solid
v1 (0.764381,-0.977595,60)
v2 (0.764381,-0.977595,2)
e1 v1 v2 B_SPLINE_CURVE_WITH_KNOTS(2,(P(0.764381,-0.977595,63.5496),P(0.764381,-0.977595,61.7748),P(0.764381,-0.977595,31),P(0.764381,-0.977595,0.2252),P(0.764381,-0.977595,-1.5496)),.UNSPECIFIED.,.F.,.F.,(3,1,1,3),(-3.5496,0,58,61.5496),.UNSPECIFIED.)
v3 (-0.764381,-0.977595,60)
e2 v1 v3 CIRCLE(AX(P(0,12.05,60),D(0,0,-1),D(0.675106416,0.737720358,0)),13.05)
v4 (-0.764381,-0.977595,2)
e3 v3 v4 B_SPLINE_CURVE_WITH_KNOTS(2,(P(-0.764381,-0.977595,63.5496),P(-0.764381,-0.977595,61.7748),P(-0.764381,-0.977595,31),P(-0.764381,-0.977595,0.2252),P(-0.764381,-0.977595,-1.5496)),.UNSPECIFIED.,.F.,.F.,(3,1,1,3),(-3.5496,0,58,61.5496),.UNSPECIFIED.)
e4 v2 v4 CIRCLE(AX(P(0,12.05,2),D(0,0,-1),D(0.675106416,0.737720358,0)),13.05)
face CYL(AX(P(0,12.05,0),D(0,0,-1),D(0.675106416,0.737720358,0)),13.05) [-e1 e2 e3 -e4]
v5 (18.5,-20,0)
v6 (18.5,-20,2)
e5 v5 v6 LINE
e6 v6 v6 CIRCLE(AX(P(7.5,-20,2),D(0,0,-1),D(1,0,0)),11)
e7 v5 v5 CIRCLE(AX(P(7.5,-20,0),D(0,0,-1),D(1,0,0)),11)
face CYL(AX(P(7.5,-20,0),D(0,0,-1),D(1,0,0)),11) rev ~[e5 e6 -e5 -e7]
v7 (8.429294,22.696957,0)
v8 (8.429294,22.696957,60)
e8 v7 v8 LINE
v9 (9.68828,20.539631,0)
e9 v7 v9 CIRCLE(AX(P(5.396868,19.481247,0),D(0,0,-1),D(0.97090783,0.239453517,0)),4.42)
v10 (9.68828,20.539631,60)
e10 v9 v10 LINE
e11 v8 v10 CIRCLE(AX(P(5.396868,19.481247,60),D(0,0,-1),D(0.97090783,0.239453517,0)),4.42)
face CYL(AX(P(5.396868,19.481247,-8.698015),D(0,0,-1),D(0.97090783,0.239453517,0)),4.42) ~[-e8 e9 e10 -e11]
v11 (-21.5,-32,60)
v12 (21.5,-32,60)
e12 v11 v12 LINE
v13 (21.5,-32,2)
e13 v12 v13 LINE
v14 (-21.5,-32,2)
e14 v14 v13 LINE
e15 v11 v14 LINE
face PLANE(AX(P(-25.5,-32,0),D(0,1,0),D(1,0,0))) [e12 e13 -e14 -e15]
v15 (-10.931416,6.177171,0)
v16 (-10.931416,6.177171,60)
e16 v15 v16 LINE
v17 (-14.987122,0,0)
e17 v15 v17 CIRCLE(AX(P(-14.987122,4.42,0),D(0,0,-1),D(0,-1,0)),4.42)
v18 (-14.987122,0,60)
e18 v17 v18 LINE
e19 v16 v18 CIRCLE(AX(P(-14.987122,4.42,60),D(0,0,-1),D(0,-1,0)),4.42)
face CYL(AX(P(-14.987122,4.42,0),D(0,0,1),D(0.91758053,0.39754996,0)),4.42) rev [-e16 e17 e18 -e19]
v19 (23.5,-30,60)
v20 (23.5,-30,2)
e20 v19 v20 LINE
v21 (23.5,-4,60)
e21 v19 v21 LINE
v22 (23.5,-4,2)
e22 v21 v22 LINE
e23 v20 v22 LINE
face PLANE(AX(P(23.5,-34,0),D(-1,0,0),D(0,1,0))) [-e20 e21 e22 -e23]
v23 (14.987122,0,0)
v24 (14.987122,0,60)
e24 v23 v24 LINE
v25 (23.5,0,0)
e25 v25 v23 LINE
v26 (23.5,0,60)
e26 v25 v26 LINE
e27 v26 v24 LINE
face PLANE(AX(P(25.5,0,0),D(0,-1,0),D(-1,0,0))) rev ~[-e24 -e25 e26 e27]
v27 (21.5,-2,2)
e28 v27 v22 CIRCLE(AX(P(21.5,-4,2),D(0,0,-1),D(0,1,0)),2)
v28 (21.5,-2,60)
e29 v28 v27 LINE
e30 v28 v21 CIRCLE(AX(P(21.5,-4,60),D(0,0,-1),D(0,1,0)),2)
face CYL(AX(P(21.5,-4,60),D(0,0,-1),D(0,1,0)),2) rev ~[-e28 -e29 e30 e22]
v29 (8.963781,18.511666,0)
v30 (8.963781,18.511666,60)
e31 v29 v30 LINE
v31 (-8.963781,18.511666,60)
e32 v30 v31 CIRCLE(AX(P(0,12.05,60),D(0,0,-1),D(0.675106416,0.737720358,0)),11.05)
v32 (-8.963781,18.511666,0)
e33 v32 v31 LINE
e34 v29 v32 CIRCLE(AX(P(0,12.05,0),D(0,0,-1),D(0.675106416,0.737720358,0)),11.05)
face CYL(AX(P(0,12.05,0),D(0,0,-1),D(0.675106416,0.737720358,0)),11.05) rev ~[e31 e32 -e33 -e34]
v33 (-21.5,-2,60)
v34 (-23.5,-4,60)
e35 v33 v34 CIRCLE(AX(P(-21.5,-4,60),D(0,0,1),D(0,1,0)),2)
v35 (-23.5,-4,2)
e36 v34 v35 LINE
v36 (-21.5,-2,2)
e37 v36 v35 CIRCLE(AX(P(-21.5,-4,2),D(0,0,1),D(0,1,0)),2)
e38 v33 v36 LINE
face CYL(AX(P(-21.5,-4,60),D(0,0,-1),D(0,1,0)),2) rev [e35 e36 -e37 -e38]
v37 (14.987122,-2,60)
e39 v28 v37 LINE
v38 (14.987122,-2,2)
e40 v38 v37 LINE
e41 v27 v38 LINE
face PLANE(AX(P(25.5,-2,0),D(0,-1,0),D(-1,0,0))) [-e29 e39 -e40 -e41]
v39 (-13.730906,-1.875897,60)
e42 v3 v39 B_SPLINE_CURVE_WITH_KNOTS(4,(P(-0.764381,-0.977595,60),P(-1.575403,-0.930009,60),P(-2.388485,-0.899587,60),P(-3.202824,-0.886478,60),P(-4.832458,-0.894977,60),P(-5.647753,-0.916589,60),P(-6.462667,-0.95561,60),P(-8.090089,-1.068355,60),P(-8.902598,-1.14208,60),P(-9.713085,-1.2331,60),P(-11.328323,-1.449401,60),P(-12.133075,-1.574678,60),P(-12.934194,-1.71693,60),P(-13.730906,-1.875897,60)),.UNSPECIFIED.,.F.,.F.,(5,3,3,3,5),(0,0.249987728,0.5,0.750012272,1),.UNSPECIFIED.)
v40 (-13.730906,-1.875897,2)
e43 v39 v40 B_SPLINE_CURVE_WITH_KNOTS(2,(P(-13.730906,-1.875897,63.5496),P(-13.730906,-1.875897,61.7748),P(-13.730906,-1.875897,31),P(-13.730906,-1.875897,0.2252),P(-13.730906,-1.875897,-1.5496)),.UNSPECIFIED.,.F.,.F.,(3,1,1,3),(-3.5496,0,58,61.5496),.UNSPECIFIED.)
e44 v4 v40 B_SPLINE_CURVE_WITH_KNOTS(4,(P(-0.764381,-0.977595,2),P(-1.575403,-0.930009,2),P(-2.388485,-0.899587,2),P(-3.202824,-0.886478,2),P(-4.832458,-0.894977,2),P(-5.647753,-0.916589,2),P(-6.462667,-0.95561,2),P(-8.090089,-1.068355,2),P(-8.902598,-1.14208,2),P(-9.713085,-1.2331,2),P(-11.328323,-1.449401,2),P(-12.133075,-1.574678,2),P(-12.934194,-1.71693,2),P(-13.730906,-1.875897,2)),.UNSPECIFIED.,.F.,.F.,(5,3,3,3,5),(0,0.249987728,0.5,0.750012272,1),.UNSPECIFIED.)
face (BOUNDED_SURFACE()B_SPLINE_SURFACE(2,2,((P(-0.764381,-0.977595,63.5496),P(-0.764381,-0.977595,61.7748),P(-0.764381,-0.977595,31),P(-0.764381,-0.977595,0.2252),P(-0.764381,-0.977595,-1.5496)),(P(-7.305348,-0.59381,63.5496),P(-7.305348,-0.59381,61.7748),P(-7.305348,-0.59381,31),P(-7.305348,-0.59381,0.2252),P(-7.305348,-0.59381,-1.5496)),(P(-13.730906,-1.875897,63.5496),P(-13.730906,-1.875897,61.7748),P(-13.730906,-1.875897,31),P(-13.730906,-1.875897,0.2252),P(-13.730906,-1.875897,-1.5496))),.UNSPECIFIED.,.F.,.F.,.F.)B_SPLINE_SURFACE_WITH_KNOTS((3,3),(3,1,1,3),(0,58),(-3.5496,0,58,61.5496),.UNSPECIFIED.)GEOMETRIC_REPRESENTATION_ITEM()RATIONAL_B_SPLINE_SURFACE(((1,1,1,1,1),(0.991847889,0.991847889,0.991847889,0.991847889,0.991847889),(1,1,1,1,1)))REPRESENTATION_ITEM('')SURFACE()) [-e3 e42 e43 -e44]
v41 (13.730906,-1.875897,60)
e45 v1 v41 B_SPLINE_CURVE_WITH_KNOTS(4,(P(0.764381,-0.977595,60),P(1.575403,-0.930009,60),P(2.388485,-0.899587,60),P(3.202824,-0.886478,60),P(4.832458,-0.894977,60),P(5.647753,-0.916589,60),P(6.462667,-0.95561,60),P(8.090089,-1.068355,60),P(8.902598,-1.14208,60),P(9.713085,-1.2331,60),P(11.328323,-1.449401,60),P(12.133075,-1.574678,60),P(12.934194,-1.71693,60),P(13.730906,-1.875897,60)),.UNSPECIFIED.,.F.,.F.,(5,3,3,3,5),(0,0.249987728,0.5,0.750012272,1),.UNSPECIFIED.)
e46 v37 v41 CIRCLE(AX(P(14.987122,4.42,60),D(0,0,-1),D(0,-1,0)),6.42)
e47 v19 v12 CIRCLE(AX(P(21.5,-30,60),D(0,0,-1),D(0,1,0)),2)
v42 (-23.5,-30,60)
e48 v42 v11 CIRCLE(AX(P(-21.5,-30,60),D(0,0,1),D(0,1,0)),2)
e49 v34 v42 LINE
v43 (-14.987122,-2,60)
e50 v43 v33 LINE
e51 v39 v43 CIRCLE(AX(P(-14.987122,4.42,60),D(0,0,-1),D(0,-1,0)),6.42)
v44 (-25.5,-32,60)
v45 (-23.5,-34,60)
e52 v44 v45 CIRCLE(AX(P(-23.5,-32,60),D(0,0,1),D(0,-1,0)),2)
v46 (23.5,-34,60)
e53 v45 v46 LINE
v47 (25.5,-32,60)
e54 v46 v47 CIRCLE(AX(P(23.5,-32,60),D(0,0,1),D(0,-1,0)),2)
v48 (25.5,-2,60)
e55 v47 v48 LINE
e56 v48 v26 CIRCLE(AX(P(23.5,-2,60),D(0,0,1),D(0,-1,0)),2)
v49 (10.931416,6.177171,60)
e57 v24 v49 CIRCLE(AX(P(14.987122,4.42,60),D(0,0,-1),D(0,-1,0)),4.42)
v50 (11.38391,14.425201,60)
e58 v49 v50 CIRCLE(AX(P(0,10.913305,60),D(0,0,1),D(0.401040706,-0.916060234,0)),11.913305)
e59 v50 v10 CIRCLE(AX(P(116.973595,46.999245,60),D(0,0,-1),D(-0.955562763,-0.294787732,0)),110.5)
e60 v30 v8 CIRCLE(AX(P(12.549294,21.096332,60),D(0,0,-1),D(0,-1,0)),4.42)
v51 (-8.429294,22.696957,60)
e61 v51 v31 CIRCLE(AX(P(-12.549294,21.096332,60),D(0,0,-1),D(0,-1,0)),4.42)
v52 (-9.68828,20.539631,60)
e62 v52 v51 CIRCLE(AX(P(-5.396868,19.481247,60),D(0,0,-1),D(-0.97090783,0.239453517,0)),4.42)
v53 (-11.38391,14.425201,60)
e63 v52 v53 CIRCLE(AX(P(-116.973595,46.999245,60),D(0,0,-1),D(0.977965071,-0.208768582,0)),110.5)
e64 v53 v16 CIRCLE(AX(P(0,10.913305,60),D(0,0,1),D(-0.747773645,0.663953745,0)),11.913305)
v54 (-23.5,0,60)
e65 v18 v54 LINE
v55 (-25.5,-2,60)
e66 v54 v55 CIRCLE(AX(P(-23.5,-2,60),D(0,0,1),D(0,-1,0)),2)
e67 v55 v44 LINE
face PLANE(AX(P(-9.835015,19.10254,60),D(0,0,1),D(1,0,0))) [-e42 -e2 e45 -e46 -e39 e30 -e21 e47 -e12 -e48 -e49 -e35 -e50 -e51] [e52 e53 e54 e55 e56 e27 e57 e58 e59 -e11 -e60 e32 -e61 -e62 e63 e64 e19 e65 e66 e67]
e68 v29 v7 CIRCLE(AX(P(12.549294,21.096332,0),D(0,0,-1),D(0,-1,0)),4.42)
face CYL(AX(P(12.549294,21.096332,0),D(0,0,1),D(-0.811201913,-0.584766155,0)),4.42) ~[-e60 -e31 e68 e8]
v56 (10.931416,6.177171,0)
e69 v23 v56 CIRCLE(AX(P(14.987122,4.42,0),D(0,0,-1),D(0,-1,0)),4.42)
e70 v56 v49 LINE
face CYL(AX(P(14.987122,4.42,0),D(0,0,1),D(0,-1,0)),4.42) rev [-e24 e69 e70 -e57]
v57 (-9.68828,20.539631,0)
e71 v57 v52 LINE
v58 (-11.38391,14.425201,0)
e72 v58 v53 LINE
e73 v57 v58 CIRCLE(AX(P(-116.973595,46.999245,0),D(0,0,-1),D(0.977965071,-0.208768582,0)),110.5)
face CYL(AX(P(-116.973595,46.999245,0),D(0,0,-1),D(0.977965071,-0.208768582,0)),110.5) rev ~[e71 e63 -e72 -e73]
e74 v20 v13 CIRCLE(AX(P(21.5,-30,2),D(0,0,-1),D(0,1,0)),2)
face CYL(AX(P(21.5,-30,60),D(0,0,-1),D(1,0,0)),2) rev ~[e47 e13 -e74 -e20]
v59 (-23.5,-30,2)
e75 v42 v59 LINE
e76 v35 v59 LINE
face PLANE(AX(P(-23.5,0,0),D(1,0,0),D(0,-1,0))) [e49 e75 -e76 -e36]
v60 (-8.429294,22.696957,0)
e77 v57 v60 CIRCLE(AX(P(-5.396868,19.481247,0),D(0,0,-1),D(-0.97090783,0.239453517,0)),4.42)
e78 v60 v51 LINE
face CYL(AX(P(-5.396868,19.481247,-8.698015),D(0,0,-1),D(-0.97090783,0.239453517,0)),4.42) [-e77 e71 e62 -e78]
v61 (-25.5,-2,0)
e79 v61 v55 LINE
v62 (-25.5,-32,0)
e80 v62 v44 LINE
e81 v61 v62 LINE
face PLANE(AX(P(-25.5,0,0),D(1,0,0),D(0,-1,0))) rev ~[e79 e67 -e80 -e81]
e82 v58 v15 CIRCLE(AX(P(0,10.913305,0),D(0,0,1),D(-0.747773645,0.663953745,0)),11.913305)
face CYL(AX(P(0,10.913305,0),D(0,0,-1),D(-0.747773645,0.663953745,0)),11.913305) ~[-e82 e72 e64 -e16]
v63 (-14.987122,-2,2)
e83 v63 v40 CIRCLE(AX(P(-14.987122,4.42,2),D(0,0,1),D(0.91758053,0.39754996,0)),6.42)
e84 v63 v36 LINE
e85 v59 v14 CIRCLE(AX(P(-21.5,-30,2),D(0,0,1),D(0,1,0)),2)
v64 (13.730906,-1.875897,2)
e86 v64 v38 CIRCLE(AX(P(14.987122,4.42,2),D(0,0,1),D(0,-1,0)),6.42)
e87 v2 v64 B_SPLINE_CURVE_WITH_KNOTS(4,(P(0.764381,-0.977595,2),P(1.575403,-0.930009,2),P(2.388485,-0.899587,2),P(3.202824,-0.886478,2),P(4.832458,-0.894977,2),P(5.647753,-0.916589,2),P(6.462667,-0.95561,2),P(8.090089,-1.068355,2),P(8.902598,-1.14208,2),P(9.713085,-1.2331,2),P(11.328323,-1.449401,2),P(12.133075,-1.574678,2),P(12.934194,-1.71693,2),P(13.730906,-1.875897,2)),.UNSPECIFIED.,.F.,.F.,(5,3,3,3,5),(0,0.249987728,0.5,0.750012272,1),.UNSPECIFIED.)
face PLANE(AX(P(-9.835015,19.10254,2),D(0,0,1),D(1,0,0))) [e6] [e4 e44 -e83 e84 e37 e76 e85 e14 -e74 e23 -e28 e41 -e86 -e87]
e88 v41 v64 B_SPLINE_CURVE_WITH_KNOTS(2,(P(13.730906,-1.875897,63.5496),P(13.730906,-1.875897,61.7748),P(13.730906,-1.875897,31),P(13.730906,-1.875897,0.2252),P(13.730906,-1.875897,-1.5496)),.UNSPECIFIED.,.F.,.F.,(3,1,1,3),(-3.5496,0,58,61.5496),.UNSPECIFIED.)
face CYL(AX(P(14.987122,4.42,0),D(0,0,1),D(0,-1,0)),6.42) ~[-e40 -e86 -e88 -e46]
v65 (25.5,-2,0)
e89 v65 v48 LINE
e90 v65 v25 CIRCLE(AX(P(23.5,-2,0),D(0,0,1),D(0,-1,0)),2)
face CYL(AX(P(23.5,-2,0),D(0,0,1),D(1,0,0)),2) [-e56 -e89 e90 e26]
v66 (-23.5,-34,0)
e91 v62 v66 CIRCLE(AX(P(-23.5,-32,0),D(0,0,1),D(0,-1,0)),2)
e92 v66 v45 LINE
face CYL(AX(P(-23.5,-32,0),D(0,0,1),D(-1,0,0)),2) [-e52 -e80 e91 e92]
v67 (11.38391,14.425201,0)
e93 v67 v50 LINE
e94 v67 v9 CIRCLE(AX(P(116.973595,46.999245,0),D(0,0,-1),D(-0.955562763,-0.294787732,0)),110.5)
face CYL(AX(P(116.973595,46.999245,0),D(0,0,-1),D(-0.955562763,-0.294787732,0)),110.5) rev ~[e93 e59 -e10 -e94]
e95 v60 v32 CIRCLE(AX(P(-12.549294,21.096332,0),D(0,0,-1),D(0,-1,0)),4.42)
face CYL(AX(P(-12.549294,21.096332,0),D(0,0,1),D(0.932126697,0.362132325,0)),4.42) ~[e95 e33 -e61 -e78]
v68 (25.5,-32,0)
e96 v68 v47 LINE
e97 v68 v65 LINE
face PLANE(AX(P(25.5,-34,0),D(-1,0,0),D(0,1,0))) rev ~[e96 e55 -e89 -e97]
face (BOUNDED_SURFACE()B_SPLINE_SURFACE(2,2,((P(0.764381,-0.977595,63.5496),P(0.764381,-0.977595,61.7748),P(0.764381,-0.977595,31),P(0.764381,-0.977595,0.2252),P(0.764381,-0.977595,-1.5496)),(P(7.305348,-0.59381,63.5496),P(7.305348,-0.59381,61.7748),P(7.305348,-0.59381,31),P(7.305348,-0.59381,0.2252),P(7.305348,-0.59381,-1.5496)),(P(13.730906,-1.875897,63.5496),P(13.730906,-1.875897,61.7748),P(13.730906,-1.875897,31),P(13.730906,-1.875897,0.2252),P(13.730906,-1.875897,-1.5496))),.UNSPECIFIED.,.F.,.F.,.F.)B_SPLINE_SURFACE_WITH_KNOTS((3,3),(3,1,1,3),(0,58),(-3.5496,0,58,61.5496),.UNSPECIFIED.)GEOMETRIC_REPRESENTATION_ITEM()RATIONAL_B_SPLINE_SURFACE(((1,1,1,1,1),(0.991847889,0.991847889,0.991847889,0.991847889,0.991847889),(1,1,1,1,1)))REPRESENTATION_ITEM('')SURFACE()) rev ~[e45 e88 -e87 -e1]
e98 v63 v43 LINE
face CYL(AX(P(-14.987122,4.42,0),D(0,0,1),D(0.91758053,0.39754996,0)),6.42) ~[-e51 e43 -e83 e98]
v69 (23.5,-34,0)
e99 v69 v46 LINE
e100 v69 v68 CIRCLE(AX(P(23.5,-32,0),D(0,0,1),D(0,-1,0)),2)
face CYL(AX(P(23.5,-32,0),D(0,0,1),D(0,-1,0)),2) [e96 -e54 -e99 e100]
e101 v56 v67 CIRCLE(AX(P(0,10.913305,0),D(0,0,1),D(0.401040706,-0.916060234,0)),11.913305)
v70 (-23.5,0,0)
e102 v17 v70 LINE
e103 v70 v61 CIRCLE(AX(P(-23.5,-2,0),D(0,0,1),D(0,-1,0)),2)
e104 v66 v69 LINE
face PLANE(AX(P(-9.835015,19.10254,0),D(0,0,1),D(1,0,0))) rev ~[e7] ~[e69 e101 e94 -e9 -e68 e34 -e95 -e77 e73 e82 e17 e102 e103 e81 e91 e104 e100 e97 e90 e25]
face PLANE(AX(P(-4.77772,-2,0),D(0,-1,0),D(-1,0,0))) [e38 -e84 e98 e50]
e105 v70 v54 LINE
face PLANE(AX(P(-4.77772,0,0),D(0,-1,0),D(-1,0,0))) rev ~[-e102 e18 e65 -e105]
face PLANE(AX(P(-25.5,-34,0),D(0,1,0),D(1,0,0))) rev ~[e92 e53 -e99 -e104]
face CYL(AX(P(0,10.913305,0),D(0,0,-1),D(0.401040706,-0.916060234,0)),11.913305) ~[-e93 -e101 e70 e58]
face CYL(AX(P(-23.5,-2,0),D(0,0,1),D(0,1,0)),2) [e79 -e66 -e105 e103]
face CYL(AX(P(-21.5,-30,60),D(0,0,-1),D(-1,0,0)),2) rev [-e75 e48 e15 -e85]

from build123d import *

# Parameters (mm, degrees)
F4_W        = 51
F4_H        = 32
F5_DEPTH    = 60
F6_T1_DEPTH = 60
F7_R        = 4.42
F9_T1_DEPTH = 77.3960297945
F10_T       = -2
F11_R       = 11
F12_DEPTH   = 2
F13_R       = 51
F14_R       = 2


# Not quite as in the source:
# - a fillet or chamfer that OpenCascade refuses, or shapes differently, is made with other operations: its cross-section is extruded or revolved along the edge and cut away or added
# - two fillets or chamfers of one size are made in one step


with BuildPart() as f5:
    # F4 (on Top) → F5 (new body)
    with BuildSketch(Plane.XY):
        with BuildLine():
            Line((-25.5, 0), (-25.5, -2))
            Line((-25.5, -2), (25.5, -2))
            Line((25.5, -2), (25.5, 0))
            Line((25.5, 0), (4.7777200824, 0))
            ThreePointArc((4.7777200824, 0), (0, -1), (-4.7777200824, 0))
            Line((-4.7777200824, 0), (-25.5, 0))
        make_face()
        with Locations((0, -18)):
            Rectangle(F4_W, F4_H)
        with BuildLine():
            ThreePointArc((-8.9084552032, 18.8231877912), (-11.6364061524, 8.3597035712), (-4.7777200824, 0))
            Line((-4.7777200824, 0), (4.7777200824, 0))
            ThreePointArc((4.7777200824, 0), (11.6364061524, 8.3597035712), (8.9084552032, 18.8231877912))
            ThreePointArc((8.9084552032, 18.8231877912), (8.2131677669, 19.5429454632), (7.4599259019, 20.2018099548))
            ThreePointArc((7.4599259019, 20.2018099548), (0, 1), (-7.4599259019, 20.2018099548))
            ThreePointArc((-7.4599259019, 20.2018099548), (-8.2131677669, 19.5429454632), (-8.9084552032, 18.8231877912))
        make_face()
        with BuildLine():
            Line((4.7777200824, 0), (-4.7777200824, 0))
            ThreePointArc((-4.7777200824, 0), (0, -1), (4.7777200824, 0))
        make_face()
        with BuildLine():
            Line((-8.9084552032, 23.9303167421), (-8.9084552032, 18.8231877912))
            ThreePointArc((-8.9084552032, 18.8231877912), (-8.2131677669, 19.5429454632), (-7.4599259019, 20.2018099548))
            Line((-7.4599259019, 20.2018099548), (-8.9084552032, 23.9303167421))
        make_face()
        with BuildLine():
            ThreePointArc((7.4599259019, 20.2018099548), (8.2131677669, 19.5429454632), (8.9084552032, 18.8231877912))
            Line((8.9084552032, 18.8231877912), (8.9084552032, 23.9303167421))
            Line((8.9084552032, 23.9303167421), (7.4599259019, 20.2018099548))
        make_face()
    extrude(amount=F5_DEPTH)

    # F6: fillet of radius 110.5 on 2 edges, made by hand

    # F6_s2 → F6_t1 (join)
    with BuildSketch(Plane.XY):
        with BuildLine():
            ThreePointArc((-8.9084552032, 23.9303167421), (-10.0405186332, 19.1502401697), (-11.3839102474, 14.4252006335))
            ThreePointArc((-11.3839102474, 14.4252006335), (-10.3817434304, 16.7567821247), (-8.9084552032, 18.8231877912))
            Line((-8.9084552032, 18.8231877912), (-8.9084552032, 23.9303167421))
        make_face()
        with BuildLine():
            ThreePointArc((11.3839102474, 14.4252006335), (10.0405186332, 19.1502401697), (8.9084552032, 23.9303167421))
            Line((8.9084552032, 23.9303167421), (8.9084552032, 18.8231877912))
            ThreePointArc((8.9084552032, 18.8231877912), (10.3817434304, 16.7567821247), (11.3839102474, 14.4252006335))
        make_face()
    extrude(amount=F6_T1_DEPTH)

    # F7
    f7_edges = [f5.edges().sort_by_distance(p)[0] for p in [
        (-4.77772, 0, 30),
        (4.77772, 0, 30),
        (7.459926, 20.20181, 30),
        (-7.459926, 20.20181, 30),
    ]]
    fillet(f7_edges, radius=F7_R)

    # F9: fillet of radius 4.42 on 2 edges, made by hand

    # F9_s2 → F9_t1 (cut)
    with BuildSketch(Plane.XY.offset(-8.6980148973)):
        with BuildLine():
            ThreePointArc((9.6882803435, 20.5396314345), (9.2143493926, 21.7090785299), (8.4292935977, 22.6969572949))
            Line((8.4292935977, 22.6969572949), (8.9084552032, 23.9303167421))
            ThreePointArc((8.9084552032, 23.9303167421), (9.2850220453, 22.2319046987), (9.6882803435, 20.5396314345))
        make_face()
        with BuildLine():
            ThreePointArc((-9.6882803435, 20.5396314345), (-9.2143493926, 21.7090785299), (-8.4292935977, 22.6969572949))
            Line((-8.4292935977, 22.6969572949), (-8.9084552032, 23.9303167421))
            ThreePointArc((-8.9084552032, 23.9303167421), (-9.2850220453, 22.2319046987), (-9.6882803435, 20.5396314345))
        make_face()
    extrude(amount=F9_T1_DEPTH, mode=Mode.SUBTRACT)

    # F10
    f10_openings = [f5.faces().sort_by_distance(p)[0] for p in [
        (0, -15.707049, 60),
    ]]
    offset(amount=F10_T, openings=f10_openings)

    # F11 (on face) → F12 (cut)
    with BuildSketch(Plane(origin=(0, 0, 0), x_dir=(1, 0, 0), z_dir=(0, 0, -1))):
        with Locations((7.5, 20)):
            Circle(F11_R)
    extrude(amount=-F12_DEPTH, mode=Mode.SUBTRACT)

    # F13
    f13_edges = [f5.edges().sort_by_distance(p)[0] for p in [
        (-8.868399, 2.47639, 31),
        (8.868399, 2.47639, 31),
    ]]
    fillet(f13_edges, radius=F13_R)

    # F14
    f14_edges = [f5.edges().sort_by_distance(p)[0] for p in [
        (-25.5, 0, 30),
        (25.5, 0, 30),
        (23.5, -32, 31),
        (-23.5, -32, 31),
        (25.5, -34, 30),
        (-25.5, -34, 30),
        (23.5, -2, 31),
        (-23.5, -2, 31),
    ]]
    fillet(f14_edges, radius=F14_R)


solid = f5.part
